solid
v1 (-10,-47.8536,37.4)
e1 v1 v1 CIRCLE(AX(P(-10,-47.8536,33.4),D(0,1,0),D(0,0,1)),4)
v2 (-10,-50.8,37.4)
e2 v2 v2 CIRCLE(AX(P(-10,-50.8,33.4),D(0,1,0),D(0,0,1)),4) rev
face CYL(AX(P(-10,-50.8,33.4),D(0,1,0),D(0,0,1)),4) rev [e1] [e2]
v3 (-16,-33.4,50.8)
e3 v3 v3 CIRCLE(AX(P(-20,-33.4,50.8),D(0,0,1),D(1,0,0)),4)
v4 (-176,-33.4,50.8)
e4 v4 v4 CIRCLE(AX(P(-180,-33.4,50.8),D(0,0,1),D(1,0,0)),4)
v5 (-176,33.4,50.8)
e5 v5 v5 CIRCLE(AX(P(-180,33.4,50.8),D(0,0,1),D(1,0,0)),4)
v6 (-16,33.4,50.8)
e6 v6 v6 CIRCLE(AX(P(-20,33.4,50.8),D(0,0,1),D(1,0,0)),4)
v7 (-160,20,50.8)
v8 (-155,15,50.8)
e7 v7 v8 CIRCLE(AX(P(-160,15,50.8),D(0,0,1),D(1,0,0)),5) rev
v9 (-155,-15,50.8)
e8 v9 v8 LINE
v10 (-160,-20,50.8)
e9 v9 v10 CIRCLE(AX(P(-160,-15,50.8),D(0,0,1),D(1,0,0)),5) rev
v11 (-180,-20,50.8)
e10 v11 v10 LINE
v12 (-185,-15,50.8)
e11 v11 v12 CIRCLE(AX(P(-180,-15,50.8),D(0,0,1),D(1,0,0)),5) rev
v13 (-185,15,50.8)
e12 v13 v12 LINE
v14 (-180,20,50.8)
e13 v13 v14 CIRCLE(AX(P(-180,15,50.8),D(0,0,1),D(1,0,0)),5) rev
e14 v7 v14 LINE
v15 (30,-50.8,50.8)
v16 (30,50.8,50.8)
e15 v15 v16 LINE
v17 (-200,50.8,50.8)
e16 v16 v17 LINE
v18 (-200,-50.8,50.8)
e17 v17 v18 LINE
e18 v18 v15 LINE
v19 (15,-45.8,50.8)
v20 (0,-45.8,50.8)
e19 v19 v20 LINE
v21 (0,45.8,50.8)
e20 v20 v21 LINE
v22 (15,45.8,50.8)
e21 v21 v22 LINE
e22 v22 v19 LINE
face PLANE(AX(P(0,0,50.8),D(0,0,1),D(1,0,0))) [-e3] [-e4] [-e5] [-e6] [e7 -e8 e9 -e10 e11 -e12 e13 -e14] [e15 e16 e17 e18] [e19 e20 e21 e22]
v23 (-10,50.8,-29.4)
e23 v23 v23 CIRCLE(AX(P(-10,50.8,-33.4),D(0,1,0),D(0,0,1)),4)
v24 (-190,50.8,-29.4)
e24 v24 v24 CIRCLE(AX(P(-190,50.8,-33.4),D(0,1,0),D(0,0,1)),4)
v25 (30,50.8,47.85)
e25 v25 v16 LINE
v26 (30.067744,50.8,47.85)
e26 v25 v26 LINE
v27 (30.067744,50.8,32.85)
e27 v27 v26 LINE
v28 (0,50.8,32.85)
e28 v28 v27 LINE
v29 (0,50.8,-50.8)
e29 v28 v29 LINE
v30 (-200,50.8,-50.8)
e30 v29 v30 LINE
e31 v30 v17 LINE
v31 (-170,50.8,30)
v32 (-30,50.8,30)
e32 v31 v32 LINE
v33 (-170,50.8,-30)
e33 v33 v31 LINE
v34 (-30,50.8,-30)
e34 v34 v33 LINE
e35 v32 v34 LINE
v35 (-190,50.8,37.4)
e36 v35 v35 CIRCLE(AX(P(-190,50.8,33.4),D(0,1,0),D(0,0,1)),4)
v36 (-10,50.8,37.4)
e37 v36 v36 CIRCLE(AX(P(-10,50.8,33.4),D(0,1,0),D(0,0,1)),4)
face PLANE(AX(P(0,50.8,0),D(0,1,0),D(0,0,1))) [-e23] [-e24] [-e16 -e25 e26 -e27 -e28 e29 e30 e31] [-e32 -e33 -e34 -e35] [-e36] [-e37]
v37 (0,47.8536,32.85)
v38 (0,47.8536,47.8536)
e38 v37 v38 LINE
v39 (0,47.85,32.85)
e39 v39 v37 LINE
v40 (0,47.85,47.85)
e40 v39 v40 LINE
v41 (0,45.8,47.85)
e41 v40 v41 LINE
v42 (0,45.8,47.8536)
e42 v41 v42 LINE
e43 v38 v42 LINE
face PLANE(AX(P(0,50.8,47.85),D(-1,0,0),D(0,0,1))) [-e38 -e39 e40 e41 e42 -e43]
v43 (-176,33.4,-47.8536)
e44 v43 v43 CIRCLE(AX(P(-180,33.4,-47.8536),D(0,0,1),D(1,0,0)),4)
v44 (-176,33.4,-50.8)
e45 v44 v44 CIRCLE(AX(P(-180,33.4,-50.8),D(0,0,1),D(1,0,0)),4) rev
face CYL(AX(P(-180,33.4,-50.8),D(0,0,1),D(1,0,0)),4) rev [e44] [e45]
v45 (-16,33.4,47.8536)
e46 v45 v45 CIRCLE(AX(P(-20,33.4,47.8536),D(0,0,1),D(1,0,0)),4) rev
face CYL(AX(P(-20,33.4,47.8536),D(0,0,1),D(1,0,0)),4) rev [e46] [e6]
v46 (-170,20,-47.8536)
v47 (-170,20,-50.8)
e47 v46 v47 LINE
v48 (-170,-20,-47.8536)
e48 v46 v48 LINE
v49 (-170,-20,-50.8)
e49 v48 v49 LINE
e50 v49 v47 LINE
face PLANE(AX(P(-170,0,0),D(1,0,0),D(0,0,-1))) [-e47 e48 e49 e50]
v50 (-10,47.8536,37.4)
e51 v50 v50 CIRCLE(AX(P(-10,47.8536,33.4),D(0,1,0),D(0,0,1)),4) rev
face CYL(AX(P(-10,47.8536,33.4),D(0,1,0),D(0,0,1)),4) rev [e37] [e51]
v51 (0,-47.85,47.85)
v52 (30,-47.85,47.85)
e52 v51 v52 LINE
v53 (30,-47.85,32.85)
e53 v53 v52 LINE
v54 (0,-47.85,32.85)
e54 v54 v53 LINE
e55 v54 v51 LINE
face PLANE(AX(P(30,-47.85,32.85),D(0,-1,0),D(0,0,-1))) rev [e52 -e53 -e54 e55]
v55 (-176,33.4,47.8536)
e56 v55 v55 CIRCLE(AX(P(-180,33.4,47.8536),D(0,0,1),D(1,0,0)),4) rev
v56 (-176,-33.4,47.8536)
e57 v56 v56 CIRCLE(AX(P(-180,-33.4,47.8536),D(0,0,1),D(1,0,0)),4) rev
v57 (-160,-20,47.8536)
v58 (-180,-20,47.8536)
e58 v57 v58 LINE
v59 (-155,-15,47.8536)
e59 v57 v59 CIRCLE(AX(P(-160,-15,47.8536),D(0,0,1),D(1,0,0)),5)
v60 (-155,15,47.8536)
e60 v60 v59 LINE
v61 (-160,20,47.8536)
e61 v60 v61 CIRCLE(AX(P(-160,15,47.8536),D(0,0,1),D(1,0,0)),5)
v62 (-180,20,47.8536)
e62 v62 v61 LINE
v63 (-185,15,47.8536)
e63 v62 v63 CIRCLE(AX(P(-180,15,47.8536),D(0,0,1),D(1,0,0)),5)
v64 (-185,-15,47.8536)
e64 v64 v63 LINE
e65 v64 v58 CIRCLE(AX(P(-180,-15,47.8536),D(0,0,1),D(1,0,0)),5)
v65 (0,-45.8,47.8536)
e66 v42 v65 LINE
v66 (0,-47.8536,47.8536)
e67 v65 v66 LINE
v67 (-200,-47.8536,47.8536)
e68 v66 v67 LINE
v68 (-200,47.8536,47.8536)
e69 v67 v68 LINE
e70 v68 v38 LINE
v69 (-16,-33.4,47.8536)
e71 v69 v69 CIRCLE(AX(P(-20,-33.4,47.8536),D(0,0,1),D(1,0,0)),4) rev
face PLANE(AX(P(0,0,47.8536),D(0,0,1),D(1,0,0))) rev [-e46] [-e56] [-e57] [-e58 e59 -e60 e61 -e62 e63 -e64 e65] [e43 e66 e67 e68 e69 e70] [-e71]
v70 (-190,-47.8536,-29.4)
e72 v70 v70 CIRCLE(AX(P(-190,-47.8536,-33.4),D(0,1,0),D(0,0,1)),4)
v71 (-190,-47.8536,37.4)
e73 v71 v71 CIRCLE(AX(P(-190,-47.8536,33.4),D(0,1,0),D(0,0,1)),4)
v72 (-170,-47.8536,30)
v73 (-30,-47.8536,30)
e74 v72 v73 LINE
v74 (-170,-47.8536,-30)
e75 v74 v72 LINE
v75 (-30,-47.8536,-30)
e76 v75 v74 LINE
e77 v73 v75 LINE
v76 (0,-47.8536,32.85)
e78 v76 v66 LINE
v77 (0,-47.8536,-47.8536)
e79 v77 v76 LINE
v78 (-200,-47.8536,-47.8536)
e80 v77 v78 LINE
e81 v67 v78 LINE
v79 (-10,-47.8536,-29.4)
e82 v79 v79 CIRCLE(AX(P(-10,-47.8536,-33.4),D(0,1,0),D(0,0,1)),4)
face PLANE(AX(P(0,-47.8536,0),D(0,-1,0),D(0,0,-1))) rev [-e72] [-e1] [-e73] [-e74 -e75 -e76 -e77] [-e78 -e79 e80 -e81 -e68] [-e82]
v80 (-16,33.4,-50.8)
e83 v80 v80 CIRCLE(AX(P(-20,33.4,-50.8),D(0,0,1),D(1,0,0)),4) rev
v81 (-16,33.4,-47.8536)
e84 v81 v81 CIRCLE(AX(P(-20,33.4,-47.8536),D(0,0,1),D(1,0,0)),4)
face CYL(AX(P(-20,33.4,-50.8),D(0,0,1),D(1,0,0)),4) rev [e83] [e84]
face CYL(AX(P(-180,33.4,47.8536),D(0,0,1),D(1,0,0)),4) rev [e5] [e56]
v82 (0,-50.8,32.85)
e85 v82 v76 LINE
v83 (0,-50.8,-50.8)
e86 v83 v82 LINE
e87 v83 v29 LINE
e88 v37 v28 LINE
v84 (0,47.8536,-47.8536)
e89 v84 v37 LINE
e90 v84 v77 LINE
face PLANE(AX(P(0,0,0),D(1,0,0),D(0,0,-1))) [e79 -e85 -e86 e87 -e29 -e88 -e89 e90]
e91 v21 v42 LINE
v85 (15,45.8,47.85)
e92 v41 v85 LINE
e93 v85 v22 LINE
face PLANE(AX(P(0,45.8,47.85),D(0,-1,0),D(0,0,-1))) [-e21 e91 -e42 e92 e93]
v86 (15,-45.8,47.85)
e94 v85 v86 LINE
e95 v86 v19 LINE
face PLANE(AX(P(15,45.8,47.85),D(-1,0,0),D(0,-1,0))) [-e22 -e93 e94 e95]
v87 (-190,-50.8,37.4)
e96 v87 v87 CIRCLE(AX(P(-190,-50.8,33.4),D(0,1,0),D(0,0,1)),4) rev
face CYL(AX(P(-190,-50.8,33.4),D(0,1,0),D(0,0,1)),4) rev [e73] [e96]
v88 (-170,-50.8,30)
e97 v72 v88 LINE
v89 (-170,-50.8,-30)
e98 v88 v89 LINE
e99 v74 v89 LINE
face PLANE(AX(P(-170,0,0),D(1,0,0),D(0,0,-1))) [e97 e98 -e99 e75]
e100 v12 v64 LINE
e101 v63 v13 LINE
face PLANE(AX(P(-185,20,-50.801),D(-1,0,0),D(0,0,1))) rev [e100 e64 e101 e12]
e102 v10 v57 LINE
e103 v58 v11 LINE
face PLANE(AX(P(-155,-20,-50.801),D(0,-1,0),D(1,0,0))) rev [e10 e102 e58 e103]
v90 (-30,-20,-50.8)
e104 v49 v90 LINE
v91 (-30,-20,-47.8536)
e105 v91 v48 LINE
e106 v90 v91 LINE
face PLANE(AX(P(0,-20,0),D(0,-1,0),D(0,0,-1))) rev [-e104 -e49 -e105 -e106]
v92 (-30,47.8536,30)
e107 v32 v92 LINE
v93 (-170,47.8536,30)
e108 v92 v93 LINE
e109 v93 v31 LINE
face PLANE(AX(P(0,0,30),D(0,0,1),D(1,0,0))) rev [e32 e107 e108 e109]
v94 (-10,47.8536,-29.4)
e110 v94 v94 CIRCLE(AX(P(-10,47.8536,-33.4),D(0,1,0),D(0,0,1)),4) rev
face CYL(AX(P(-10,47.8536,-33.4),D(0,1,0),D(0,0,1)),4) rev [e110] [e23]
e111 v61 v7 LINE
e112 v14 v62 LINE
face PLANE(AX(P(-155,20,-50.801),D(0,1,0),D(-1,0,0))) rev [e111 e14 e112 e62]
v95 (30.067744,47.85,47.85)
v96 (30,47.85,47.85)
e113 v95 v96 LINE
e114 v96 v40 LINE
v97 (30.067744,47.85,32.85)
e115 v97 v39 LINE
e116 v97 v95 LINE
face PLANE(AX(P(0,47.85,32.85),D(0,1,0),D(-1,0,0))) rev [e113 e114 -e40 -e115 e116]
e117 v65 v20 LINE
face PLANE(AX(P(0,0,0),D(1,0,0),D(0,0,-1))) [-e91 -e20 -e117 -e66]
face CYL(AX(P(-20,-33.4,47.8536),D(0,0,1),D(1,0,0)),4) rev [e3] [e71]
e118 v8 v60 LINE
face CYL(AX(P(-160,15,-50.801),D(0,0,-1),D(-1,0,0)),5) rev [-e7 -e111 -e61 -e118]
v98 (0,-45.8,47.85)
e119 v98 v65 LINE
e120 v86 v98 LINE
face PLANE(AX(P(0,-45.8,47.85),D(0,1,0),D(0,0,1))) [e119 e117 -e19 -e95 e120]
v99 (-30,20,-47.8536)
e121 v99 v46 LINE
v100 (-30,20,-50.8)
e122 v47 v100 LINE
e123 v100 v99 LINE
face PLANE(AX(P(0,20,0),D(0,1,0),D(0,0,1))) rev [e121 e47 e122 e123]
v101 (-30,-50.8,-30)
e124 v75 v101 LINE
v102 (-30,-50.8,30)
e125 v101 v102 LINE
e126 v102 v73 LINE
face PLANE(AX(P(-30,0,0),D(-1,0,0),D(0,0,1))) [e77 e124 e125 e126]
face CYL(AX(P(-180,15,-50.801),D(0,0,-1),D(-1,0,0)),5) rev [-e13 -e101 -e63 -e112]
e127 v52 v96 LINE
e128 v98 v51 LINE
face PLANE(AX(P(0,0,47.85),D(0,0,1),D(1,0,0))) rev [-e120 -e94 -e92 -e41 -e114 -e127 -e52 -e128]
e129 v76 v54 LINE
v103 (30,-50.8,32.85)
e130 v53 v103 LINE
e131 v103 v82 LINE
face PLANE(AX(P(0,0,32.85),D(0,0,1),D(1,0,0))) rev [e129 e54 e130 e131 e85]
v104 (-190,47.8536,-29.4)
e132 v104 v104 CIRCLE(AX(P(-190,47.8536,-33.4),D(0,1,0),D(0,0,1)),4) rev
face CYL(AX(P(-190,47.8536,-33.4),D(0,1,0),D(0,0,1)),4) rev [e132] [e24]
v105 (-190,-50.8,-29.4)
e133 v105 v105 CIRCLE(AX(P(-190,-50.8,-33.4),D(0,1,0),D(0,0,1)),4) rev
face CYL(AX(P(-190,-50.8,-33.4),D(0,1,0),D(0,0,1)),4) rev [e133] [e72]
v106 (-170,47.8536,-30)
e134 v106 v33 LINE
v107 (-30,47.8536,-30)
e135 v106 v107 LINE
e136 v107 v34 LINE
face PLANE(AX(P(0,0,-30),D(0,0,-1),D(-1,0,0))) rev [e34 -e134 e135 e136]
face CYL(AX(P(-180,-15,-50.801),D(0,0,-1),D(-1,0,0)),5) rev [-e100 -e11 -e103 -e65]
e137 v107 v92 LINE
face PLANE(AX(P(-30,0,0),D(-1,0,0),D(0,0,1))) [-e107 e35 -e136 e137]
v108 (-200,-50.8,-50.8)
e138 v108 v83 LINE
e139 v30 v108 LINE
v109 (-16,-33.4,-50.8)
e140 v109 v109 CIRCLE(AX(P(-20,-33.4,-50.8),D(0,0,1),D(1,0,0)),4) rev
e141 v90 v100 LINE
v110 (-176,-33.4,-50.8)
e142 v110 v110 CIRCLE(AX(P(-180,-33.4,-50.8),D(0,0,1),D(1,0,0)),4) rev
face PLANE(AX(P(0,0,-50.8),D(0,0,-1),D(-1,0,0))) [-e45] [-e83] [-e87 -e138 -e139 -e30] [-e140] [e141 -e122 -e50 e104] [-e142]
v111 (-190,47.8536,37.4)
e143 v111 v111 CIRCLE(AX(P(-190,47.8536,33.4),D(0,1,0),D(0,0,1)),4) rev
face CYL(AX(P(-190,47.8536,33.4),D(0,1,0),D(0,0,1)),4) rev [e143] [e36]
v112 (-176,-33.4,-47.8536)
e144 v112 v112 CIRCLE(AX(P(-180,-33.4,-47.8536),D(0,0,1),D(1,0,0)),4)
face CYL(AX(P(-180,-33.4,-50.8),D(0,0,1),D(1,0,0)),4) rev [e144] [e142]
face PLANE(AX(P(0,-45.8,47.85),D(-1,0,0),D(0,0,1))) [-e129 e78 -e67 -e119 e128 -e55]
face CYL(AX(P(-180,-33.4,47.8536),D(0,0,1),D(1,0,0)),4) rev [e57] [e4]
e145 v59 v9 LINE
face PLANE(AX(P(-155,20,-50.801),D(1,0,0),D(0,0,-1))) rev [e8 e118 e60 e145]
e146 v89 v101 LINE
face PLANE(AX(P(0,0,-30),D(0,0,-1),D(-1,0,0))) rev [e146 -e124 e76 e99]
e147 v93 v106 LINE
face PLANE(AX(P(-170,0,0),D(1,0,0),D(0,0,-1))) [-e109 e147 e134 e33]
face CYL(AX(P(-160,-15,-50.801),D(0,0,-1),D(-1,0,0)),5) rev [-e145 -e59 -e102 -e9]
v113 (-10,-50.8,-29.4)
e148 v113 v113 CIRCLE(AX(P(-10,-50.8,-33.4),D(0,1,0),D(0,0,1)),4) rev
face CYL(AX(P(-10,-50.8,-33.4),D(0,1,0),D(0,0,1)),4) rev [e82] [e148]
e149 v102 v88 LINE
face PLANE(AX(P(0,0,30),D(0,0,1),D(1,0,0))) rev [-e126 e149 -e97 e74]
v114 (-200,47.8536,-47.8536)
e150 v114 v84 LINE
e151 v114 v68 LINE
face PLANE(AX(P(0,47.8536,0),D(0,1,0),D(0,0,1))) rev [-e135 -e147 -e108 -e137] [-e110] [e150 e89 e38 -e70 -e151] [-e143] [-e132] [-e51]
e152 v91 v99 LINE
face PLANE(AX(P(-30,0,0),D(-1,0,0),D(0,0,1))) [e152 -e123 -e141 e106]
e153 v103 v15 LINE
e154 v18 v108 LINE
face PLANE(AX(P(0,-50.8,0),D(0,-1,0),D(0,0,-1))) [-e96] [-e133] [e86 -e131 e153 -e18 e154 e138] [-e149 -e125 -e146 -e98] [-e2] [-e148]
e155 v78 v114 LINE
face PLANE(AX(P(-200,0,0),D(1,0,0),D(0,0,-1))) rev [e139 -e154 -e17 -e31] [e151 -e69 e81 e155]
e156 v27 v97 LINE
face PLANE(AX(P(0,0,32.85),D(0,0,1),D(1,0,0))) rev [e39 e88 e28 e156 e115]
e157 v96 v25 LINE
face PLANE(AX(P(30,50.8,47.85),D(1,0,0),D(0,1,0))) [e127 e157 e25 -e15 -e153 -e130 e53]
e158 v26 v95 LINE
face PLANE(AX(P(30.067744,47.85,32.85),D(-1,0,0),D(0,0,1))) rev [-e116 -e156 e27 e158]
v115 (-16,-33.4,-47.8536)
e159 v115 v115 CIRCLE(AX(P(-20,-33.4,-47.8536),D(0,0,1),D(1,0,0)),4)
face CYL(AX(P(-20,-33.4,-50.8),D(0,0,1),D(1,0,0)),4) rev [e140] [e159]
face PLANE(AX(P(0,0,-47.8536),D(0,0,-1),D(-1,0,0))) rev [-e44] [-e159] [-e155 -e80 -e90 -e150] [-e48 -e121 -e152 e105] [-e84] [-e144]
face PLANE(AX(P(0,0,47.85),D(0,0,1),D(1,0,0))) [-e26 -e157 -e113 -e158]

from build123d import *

# Parameters (mm, degrees)
BOSS_EXTRUDE1_START         = -2.9464
BOSS_EXTRUDE1_OUTLINE_W     = 230
BOSS_EXTRUDE1_OUTLINE_H     = 101.6
BOSS_EXTRUDE1_OUTLINE_R     = 4
BOSS_EXTRUDE1_OUTLINE_W_2   = 15
BOSS_EXTRUDE1_OUTLINE_H_2   = 91.6
BOSS_EXTRUDE1_DEPTH         = 2.9464
BOSS_EXTRUDE1_START_2       = -101.6
BOSS_EXTRUDE1_2_OUTLINE_W   = 200
BOSS_EXTRUDE1_2_OUTLINE_H   = 101.6
BOSS_EXTRUDE1_2_OUTLINE_R   = 4
BOSS_EXTRUDE1_2_OUTLINE_W_2 = 140
BOSS_EXTRUDE1_2_OUTLINE_H_2 = 40
BOSS_EXTRUDE1_2_DEPTH       = 2.9464
BOSS_EXTRUDE1_START_3       = -98.6536
BOSS_EXTRUDE1_3_OUTLINE_W   = 30
BOSS_EXTRUDE1_3_OUTLINE_H   = 2.9464
BOSS_EXTRUDE1_3_DEPTH       = 95.7072
BOSS_EXTRUDE1_4_OUTLINE_W   = 140
BOSS_EXTRUDE1_4_OUTLINE_H   = 2.9464
BOSS_EXTRUDE1_4_DEPTH       = 17.8536
BOSS_EXTRUDE1_START_4       = -20.8
BOSS_EXTRUDE1_5_OUTLINE_W   = 140
BOSS_EXTRUDE1_5_OUTLINE_H   = 2.9464
BOSS_EXTRUDE1_5_DEPTH       = 17.8536
BOSS_EXTRUDE1_START_5       = -2.95
BOSS_EXTRUDE1_6_DEPTH       = 0.0036
BOSS_EXTRUDE1_START_6       = -50.8
BOSS_EXTRUDE1_7_OUTLINE_R   = 4
BOSS_EXTRUDE1_7_DEPTH       = 101.6
SKETCH3_W                   = 30
SKETCH3_H                   = 2.95
SKETCH3_W_2                 = 30.067744433
BOSS_EXTRUDE2_DEPTH         = 15
CUT_EXTRUDE1_REACH          = 232.007
SKETCH4_W                   = 30
SKETCH4_H                   = 40
FILLET1_R                   = 5
FILLET2_R                   = 5
FILLET3_R                   = 5
FILLET4_R                   = 5


with BuildPart() as part:
    # Boss-Extrude1: read off the stored shape, not the designer's step
    # Boss-Extrude1 outline → Boss-Extrude1 (new body)
    with BuildSketch(Plane.XY.offset(50.8).offset(BOSS_EXTRUDE1_START)):
        with Locations((-85, 0)):
            Rectangle(BOSS_EXTRUDE1_OUTLINE_W, BOSS_EXTRUDE1_OUTLINE_H)
        with Locations((-20, 33.4)):
            Circle(BOSS_EXTRUDE1_OUTLINE_R, mode=Mode.SUBTRACT)
        with Locations((-180, 33.4)):
            Circle(BOSS_EXTRUDE1_OUTLINE_R, mode=Mode.SUBTRACT)
        with Locations((7.5, 0)):
            Rectangle(BOSS_EXTRUDE1_OUTLINE_W_2, BOSS_EXTRUDE1_OUTLINE_H_2, mode=Mode.SUBTRACT)
        with Locations((-180, -33.4)):
            Circle(BOSS_EXTRUDE1_OUTLINE_R, mode=Mode.SUBTRACT)
        with Locations((-20, -33.4)):
            Circle(BOSS_EXTRUDE1_OUTLINE_R, mode=Mode.SUBTRACT)
    extrude(amount=BOSS_EXTRUDE1_DEPTH)



with BuildPart() as body_2:
    # Boss-Extrude1 2 outline → Boss-Extrude1 2 (new body)
    with BuildSketch(Plane.XY.offset(50.8).offset(BOSS_EXTRUDE1_START_2)):
        with Locations((-100, 0)):
            Rectangle(BOSS_EXTRUDE1_2_OUTLINE_W, BOSS_EXTRUDE1_2_OUTLINE_H)
        with Locations((-20, 33.4)):
            Circle(BOSS_EXTRUDE1_2_OUTLINE_R, mode=Mode.SUBTRACT)
        with Locations((-180, 33.4)):
            Circle(BOSS_EXTRUDE1_2_OUTLINE_R, mode=Mode.SUBTRACT)
        with Locations((-180, -33.4)):
            Circle(BOSS_EXTRUDE1_2_OUTLINE_R, mode=Mode.SUBTRACT)
        with Locations((-100, 0)):
            Rectangle(BOSS_EXTRUDE1_2_OUTLINE_W_2, BOSS_EXTRUDE1_2_OUTLINE_H_2, mode=Mode.SUBTRACT)
        with Locations((-20, -33.4)):
            Circle(BOSS_EXTRUDE1_2_OUTLINE_R, mode=Mode.SUBTRACT)
    extrude(amount=BOSS_EXTRUDE1_2_DEPTH)


with BuildPart() as part_1:
    add(part.part)

    add(body_2.part)  # Boss-Extrude1 3 merges body 2
    # Boss-Extrude1 3 outline → Boss-Extrude1 3 (add)
    with BuildSketch(Plane.XY.offset(50.8).offset(BOSS_EXTRUDE1_START_3)):
        with Locations((-15, -49.3268)):
            Rectangle(BOSS_EXTRUDE1_3_OUTLINE_W, BOSS_EXTRUDE1_3_OUTLINE_H)
        with Locations((-185, -49.3268)):
            Rectangle(BOSS_EXTRUDE1_3_OUTLINE_W, BOSS_EXTRUDE1_3_OUTLINE_H)
        with Locations((-15, 49.3268)):
            Rectangle(BOSS_EXTRUDE1_3_OUTLINE_W, BOSS_EXTRUDE1_3_OUTLINE_H)
        with Locations((-185, 49.3268)):
            Rectangle(BOSS_EXTRUDE1_3_OUTLINE_W, BOSS_EXTRUDE1_3_OUTLINE_H)
    extrude(amount=BOSS_EXTRUDE1_3_DEPTH)

    # Boss-Extrude1 4 outline → Boss-Extrude1 4 (add)
    with BuildSketch(Plane.XY.offset(50.8).offset(BOSS_EXTRUDE1_START_3)):
        with Locations((-100, -49.3268)):
            Rectangle(BOSS_EXTRUDE1_4_OUTLINE_W, BOSS_EXTRUDE1_4_OUTLINE_H)
        with Locations((-100, 49.3268)):
            Rectangle(BOSS_EXTRUDE1_4_OUTLINE_W, BOSS_EXTRUDE1_4_OUTLINE_H)
    extrude(amount=BOSS_EXTRUDE1_4_DEPTH)

    # Boss-Extrude1 5 outline → Boss-Extrude1 5 (add)
    with BuildSketch(Plane.XY.offset(50.8).offset(BOSS_EXTRUDE1_START_4)):
        with Locations((-100, -49.3268)):
            Rectangle(BOSS_EXTRUDE1_5_OUTLINE_W, BOSS_EXTRUDE1_5_OUTLINE_H)
        with Locations((-100, 49.3268)):
            Rectangle(BOSS_EXTRUDE1_5_OUTLINE_W, BOSS_EXTRUDE1_5_OUTLINE_H)
    extrude(amount=BOSS_EXTRUDE1_5_DEPTH)

    # Boss-Extrude1 6 outline → Boss-Extrude1 6 (add)
    with BuildSketch(Plane.XY.offset(50.8).offset(BOSS_EXTRUDE1_START_5)):
        Polygon((0, -45.8), (0, -50.8), (30, -50.8), (30, 50.8), (0, 50.8), (0, 45.8), (15, 45.8), (15, -45.8), align=None)
    extrude(amount=BOSS_EXTRUDE1_6_DEPTH)

    # Boss-Extrude1 7 outline → Boss-Extrude1 7 (cut)
    with BuildSketch(Plane(origin=(0, 0, 0), x_dir=(1, 0, 0), z_dir=(0, 1, 0)).offset(BOSS_EXTRUDE1_START_6)):
        with Locations((-190, 33.4)):
            Circle(BOSS_EXTRUDE1_7_OUTLINE_R)
        with Locations((-190, -33.4)):
            Circle(BOSS_EXTRUDE1_7_OUTLINE_R)
        with Locations((-10, 33.4)):
            Circle(BOSS_EXTRUDE1_7_OUTLINE_R)
        with Locations((-10, -33.4)):
            Circle(BOSS_EXTRUDE1_7_OUTLINE_R)
    extrude(amount=BOSS_EXTRUDE1_7_DEPTH, mode=Mode.SUBTRACT)

    # Sketch3 → Boss-Extrude2 (add)
    with BuildSketch(Plane(origin=(0, 0, 47.85), x_dir=(-1, 0, 0), z_dir=(0, 0, -1))):
        with Locations((-15, -49.325)):
            Rectangle(SKETCH3_W, SKETCH3_H)
        with Locations((-15.033872217, 49.325)):
            Rectangle(SKETCH3_W_2, SKETCH3_H)
    extrude(amount=BOSS_EXTRUDE2_DEPTH)

    # Sketch4 → Cut-Extrude1 (cut, up to next)
    with BuildSketch(Plane.XY.offset(50.8), mode=Mode.PRIVATE) as cut_extrude1_sk1:
        with Locations((-170, 0)):
            Rectangle(SKETCH4_W, SKETCH4_H)
    cut_extrude1_tool1 = extrude(cut_extrude1_sk1.sketch, amount=-CUT_EXTRUDE1_REACH, mode=Mode.PRIVATE) & part_1.part
    add(cut_extrude1_tool1.solids().sort_by_distance((-170, 0, 50.8))[0], mode=Mode.SUBTRACT)

    # Fillet1
    fillet1_edges = [part_1.edges().sort_by_distance(p)[0] for p in [
        (-155, -20, 49.3268),
    ]]
    fillet(fillet1_edges, radius=FILLET1_R)

    # Fillet2
    fillet2_edges = [part_1.edges().sort_by_distance(p)[0] for p in [
        (-155, 20, 49.3268),
    ]]
    fillet(fillet2_edges, radius=FILLET2_R)

    # Fillet3
    fillet3_edges = [part_1.edges().sort_by_distance(p)[0] for p in [
        (-185, -20, 49.3268),
    ]]
    fillet(fillet3_edges, radius=FILLET3_R)

    # Fillet4
    fillet4_edges = [part_1.edges().sort_by_distance(p)[0] for p in [
        (-185, 20, 49.3268),
    ]]
    fillet(fillet4_edges, radius=FILLET4_R)


solid = part_1.part
